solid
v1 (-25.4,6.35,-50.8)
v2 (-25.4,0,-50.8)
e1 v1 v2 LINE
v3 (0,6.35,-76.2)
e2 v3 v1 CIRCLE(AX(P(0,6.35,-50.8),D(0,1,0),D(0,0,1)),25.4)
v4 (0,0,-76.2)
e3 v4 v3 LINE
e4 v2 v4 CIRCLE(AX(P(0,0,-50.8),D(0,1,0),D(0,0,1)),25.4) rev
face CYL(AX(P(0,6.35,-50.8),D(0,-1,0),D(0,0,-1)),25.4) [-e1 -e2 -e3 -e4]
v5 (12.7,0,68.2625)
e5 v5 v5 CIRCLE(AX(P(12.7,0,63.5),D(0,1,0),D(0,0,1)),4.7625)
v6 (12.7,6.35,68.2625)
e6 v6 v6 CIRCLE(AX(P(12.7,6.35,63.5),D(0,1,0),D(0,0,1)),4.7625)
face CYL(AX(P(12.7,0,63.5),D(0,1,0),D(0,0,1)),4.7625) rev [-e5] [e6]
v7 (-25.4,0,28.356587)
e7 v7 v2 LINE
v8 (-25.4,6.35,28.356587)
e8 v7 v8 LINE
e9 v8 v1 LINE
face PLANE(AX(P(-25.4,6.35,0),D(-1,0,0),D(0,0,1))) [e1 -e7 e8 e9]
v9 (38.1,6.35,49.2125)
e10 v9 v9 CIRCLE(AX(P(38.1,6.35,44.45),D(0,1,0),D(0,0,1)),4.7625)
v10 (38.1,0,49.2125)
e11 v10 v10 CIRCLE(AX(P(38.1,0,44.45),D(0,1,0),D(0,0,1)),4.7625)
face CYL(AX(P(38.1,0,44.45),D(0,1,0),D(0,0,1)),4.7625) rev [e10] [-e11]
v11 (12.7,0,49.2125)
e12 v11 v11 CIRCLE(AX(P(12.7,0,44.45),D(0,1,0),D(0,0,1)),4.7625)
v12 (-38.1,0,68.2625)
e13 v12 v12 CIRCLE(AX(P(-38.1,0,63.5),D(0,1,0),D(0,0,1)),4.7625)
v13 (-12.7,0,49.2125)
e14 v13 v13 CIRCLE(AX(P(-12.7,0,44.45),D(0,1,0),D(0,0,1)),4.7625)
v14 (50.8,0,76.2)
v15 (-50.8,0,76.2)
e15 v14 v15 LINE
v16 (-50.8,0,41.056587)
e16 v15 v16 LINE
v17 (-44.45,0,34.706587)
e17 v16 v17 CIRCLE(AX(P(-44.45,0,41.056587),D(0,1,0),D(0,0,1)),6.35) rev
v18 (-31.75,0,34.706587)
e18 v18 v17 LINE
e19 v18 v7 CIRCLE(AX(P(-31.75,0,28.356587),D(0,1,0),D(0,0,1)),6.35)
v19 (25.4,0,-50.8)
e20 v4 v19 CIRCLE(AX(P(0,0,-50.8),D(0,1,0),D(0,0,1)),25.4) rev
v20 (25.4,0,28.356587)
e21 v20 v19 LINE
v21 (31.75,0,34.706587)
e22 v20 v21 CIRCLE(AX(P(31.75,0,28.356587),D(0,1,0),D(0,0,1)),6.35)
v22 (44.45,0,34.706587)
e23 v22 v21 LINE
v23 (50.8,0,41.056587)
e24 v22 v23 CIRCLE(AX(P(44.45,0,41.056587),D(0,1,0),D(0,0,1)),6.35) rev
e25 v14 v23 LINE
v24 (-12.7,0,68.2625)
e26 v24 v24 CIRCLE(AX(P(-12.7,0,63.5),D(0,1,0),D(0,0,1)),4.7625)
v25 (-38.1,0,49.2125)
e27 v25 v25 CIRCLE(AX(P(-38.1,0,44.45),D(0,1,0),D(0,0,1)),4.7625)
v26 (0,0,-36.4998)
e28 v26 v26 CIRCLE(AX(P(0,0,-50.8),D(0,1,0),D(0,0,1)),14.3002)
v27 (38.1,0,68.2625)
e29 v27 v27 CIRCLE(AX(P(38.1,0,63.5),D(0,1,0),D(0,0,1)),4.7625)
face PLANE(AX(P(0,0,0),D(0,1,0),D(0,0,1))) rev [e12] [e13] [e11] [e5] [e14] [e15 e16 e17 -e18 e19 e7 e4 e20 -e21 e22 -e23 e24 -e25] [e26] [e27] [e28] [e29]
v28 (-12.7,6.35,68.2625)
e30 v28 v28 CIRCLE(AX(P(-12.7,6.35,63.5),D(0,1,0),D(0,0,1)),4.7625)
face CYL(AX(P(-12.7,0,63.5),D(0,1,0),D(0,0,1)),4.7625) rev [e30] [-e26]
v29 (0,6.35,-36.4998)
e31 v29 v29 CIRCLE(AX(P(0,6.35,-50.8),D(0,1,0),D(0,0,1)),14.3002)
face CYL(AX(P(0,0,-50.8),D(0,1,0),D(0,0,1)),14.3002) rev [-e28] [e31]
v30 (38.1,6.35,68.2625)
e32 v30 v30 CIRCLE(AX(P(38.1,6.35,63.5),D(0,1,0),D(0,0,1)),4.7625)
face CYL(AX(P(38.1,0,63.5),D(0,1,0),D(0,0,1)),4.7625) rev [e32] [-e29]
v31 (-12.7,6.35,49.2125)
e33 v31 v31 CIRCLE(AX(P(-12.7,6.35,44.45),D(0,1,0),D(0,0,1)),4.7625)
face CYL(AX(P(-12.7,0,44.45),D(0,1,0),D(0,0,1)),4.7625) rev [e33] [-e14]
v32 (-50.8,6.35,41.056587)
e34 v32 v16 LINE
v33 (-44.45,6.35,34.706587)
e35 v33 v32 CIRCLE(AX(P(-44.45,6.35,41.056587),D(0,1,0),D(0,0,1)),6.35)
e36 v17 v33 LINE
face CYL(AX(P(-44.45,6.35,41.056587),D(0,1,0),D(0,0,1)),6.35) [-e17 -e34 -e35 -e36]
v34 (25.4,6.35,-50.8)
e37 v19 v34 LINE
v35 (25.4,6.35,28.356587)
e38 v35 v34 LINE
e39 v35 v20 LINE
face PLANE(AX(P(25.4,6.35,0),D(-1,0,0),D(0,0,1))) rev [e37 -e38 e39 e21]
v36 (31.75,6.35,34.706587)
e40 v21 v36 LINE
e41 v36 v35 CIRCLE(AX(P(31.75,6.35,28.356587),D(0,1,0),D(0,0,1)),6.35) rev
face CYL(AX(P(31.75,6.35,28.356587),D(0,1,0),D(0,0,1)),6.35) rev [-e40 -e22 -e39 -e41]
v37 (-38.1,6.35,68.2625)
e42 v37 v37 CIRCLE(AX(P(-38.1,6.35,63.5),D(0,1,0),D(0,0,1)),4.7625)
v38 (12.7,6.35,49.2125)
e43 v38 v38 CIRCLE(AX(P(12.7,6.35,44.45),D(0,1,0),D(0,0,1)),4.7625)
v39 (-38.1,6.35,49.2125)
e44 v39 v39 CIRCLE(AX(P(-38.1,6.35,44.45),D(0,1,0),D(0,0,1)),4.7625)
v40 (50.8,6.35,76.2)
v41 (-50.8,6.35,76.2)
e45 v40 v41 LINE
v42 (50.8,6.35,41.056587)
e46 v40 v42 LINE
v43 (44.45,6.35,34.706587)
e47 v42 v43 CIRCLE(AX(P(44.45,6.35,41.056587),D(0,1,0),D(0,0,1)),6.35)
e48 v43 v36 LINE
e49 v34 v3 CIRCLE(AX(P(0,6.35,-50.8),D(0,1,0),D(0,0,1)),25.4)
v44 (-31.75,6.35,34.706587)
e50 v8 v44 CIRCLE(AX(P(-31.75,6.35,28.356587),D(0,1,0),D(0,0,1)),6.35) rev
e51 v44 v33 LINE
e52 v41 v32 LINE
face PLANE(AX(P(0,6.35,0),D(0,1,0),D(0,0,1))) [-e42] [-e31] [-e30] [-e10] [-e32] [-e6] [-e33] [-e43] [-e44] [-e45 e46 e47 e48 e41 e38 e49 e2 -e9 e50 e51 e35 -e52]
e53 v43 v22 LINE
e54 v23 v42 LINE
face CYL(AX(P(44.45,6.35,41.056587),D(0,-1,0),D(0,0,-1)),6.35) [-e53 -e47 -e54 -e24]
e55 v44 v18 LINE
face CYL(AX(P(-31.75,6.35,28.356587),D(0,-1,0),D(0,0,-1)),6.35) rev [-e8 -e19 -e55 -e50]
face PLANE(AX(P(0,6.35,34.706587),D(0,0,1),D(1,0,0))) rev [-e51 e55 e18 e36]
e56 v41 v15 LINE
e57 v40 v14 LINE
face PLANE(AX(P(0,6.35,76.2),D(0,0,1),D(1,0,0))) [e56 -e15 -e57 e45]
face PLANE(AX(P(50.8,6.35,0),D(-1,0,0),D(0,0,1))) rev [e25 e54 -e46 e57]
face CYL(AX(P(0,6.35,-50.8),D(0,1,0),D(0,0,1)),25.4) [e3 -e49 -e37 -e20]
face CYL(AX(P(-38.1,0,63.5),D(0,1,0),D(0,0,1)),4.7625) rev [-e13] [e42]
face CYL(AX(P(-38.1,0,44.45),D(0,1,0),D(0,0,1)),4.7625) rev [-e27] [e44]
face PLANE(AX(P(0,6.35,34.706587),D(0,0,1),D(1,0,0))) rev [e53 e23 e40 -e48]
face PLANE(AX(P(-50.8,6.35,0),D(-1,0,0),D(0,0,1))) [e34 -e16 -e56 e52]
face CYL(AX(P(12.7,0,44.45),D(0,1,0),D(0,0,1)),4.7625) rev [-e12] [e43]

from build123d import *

# Parameters (mm, degrees)
SKETCH1_W            = 25.4
SKETCH1_H            = 41.493412961
SKETCH1_W_2          = 50.8
SKETCH1_H_2          = 110.906587039
BOSS_EXTRUDE1_DEPTH  = 6.35
SKETCH2_R            = 14.3002
CUT_EXTRUDE1_DEPTH   = 6.35
SKETCH3_R            = 4.7625
CUT_EXTRUDE2_DEPTH   = 6.35
LPATTERN1_COUNT      = 4
LPATTERN1_PITCH      = 25.4
LPATTERN1_COUNT_DIR2 = 2
LPATTERN1_PITCH_DIR2 = 19.05
FILLET1_R            = 6.35
FILLET2_R            = 25.4


with BuildPart() as part:
    # Sketch1 → Boss-Extrude1 (new body)
    with BuildSketch(Plane(origin=(0, 0, 0), x_dir=(1, 0, 0), z_dir=(0, 1, 0))):
        with Locations((-38.1, -55.45329352)):
            Rectangle(SKETCH1_W, SKETCH1_H)
        with Locations((0, -55.45329352)):
            Rectangle(SKETCH1_W_2, SKETCH1_H)
        with Locations((0, 20.746706481)):
            Rectangle(SKETCH1_W_2, SKETCH1_H_2)
        with Locations((38.1, -55.45329352)):
            Rectangle(SKETCH1_W, SKETCH1_H)
    extrude(amount=BOSS_EXTRUDE1_DEPTH)

    # Sketch2 → Cut-Extrude1 (cut)
    with BuildSketch(Plane(origin=(0, 6.35, 0), x_dir=(1, 0, 0), z_dir=(0, 1, 0))):
        with Locations(Location((0, 50.8, 0), (0, 0, 270))):
            Circle(SKETCH2_R)
    extrude(amount=-CUT_EXTRUDE1_DEPTH, mode=Mode.SUBTRACT)

    # Sketch3 → Cut-Extrude2 (cut)
    with BuildSketch(Plane(origin=(0, 6.35, 0), x_dir=(1, 0, 0), z_dir=(0, 1, 0))):
        with Locations(Location((-38.1, -63.5, 0), (0, 0, 270))):
            Circle(SKETCH3_R)
    cut_extrude2 = extrude(amount=-CUT_EXTRUDE2_DEPTH, mode=Mode.SUBTRACT)

    # LPattern1: Cut-Extrude2 4 × 2
    with Locations(*[(i * LPATTERN1_PITCH, 0, -j * LPATTERN1_PITCH_DIR2) for i in range(LPATTERN1_COUNT) for j in range(LPATTERN1_COUNT_DIR2) if (i, j) != (0, 0)]):
        add(cut_extrude2, mode=Mode.SUBTRACT)

    # Fillet1
    fillet1_edges = [part.edges().sort_by_distance(p)[0] for p in [
        (-50.8, 3.175, 34.706587039),
        (-25.4, 3.175, 34.706587039),
        (25.4, 3.175, 34.706587039),
        (50.8, 3.175, 34.706587039),
    ]]
    fillet(fillet1_edges, radius=FILLET1_R)

    # Fillet2
    fillet2_edges = [part.edges().sort_by_distance(p)[0] for p in [
        (25.4, 3.175, -76.2),
        (-25.4, 3.175, -76.2),
    ]]
    fillet(fillet2_edges, radius=FILLET2_R - 0.0001)  # a hair under: the kernel refuses the full size


solid = part.part
